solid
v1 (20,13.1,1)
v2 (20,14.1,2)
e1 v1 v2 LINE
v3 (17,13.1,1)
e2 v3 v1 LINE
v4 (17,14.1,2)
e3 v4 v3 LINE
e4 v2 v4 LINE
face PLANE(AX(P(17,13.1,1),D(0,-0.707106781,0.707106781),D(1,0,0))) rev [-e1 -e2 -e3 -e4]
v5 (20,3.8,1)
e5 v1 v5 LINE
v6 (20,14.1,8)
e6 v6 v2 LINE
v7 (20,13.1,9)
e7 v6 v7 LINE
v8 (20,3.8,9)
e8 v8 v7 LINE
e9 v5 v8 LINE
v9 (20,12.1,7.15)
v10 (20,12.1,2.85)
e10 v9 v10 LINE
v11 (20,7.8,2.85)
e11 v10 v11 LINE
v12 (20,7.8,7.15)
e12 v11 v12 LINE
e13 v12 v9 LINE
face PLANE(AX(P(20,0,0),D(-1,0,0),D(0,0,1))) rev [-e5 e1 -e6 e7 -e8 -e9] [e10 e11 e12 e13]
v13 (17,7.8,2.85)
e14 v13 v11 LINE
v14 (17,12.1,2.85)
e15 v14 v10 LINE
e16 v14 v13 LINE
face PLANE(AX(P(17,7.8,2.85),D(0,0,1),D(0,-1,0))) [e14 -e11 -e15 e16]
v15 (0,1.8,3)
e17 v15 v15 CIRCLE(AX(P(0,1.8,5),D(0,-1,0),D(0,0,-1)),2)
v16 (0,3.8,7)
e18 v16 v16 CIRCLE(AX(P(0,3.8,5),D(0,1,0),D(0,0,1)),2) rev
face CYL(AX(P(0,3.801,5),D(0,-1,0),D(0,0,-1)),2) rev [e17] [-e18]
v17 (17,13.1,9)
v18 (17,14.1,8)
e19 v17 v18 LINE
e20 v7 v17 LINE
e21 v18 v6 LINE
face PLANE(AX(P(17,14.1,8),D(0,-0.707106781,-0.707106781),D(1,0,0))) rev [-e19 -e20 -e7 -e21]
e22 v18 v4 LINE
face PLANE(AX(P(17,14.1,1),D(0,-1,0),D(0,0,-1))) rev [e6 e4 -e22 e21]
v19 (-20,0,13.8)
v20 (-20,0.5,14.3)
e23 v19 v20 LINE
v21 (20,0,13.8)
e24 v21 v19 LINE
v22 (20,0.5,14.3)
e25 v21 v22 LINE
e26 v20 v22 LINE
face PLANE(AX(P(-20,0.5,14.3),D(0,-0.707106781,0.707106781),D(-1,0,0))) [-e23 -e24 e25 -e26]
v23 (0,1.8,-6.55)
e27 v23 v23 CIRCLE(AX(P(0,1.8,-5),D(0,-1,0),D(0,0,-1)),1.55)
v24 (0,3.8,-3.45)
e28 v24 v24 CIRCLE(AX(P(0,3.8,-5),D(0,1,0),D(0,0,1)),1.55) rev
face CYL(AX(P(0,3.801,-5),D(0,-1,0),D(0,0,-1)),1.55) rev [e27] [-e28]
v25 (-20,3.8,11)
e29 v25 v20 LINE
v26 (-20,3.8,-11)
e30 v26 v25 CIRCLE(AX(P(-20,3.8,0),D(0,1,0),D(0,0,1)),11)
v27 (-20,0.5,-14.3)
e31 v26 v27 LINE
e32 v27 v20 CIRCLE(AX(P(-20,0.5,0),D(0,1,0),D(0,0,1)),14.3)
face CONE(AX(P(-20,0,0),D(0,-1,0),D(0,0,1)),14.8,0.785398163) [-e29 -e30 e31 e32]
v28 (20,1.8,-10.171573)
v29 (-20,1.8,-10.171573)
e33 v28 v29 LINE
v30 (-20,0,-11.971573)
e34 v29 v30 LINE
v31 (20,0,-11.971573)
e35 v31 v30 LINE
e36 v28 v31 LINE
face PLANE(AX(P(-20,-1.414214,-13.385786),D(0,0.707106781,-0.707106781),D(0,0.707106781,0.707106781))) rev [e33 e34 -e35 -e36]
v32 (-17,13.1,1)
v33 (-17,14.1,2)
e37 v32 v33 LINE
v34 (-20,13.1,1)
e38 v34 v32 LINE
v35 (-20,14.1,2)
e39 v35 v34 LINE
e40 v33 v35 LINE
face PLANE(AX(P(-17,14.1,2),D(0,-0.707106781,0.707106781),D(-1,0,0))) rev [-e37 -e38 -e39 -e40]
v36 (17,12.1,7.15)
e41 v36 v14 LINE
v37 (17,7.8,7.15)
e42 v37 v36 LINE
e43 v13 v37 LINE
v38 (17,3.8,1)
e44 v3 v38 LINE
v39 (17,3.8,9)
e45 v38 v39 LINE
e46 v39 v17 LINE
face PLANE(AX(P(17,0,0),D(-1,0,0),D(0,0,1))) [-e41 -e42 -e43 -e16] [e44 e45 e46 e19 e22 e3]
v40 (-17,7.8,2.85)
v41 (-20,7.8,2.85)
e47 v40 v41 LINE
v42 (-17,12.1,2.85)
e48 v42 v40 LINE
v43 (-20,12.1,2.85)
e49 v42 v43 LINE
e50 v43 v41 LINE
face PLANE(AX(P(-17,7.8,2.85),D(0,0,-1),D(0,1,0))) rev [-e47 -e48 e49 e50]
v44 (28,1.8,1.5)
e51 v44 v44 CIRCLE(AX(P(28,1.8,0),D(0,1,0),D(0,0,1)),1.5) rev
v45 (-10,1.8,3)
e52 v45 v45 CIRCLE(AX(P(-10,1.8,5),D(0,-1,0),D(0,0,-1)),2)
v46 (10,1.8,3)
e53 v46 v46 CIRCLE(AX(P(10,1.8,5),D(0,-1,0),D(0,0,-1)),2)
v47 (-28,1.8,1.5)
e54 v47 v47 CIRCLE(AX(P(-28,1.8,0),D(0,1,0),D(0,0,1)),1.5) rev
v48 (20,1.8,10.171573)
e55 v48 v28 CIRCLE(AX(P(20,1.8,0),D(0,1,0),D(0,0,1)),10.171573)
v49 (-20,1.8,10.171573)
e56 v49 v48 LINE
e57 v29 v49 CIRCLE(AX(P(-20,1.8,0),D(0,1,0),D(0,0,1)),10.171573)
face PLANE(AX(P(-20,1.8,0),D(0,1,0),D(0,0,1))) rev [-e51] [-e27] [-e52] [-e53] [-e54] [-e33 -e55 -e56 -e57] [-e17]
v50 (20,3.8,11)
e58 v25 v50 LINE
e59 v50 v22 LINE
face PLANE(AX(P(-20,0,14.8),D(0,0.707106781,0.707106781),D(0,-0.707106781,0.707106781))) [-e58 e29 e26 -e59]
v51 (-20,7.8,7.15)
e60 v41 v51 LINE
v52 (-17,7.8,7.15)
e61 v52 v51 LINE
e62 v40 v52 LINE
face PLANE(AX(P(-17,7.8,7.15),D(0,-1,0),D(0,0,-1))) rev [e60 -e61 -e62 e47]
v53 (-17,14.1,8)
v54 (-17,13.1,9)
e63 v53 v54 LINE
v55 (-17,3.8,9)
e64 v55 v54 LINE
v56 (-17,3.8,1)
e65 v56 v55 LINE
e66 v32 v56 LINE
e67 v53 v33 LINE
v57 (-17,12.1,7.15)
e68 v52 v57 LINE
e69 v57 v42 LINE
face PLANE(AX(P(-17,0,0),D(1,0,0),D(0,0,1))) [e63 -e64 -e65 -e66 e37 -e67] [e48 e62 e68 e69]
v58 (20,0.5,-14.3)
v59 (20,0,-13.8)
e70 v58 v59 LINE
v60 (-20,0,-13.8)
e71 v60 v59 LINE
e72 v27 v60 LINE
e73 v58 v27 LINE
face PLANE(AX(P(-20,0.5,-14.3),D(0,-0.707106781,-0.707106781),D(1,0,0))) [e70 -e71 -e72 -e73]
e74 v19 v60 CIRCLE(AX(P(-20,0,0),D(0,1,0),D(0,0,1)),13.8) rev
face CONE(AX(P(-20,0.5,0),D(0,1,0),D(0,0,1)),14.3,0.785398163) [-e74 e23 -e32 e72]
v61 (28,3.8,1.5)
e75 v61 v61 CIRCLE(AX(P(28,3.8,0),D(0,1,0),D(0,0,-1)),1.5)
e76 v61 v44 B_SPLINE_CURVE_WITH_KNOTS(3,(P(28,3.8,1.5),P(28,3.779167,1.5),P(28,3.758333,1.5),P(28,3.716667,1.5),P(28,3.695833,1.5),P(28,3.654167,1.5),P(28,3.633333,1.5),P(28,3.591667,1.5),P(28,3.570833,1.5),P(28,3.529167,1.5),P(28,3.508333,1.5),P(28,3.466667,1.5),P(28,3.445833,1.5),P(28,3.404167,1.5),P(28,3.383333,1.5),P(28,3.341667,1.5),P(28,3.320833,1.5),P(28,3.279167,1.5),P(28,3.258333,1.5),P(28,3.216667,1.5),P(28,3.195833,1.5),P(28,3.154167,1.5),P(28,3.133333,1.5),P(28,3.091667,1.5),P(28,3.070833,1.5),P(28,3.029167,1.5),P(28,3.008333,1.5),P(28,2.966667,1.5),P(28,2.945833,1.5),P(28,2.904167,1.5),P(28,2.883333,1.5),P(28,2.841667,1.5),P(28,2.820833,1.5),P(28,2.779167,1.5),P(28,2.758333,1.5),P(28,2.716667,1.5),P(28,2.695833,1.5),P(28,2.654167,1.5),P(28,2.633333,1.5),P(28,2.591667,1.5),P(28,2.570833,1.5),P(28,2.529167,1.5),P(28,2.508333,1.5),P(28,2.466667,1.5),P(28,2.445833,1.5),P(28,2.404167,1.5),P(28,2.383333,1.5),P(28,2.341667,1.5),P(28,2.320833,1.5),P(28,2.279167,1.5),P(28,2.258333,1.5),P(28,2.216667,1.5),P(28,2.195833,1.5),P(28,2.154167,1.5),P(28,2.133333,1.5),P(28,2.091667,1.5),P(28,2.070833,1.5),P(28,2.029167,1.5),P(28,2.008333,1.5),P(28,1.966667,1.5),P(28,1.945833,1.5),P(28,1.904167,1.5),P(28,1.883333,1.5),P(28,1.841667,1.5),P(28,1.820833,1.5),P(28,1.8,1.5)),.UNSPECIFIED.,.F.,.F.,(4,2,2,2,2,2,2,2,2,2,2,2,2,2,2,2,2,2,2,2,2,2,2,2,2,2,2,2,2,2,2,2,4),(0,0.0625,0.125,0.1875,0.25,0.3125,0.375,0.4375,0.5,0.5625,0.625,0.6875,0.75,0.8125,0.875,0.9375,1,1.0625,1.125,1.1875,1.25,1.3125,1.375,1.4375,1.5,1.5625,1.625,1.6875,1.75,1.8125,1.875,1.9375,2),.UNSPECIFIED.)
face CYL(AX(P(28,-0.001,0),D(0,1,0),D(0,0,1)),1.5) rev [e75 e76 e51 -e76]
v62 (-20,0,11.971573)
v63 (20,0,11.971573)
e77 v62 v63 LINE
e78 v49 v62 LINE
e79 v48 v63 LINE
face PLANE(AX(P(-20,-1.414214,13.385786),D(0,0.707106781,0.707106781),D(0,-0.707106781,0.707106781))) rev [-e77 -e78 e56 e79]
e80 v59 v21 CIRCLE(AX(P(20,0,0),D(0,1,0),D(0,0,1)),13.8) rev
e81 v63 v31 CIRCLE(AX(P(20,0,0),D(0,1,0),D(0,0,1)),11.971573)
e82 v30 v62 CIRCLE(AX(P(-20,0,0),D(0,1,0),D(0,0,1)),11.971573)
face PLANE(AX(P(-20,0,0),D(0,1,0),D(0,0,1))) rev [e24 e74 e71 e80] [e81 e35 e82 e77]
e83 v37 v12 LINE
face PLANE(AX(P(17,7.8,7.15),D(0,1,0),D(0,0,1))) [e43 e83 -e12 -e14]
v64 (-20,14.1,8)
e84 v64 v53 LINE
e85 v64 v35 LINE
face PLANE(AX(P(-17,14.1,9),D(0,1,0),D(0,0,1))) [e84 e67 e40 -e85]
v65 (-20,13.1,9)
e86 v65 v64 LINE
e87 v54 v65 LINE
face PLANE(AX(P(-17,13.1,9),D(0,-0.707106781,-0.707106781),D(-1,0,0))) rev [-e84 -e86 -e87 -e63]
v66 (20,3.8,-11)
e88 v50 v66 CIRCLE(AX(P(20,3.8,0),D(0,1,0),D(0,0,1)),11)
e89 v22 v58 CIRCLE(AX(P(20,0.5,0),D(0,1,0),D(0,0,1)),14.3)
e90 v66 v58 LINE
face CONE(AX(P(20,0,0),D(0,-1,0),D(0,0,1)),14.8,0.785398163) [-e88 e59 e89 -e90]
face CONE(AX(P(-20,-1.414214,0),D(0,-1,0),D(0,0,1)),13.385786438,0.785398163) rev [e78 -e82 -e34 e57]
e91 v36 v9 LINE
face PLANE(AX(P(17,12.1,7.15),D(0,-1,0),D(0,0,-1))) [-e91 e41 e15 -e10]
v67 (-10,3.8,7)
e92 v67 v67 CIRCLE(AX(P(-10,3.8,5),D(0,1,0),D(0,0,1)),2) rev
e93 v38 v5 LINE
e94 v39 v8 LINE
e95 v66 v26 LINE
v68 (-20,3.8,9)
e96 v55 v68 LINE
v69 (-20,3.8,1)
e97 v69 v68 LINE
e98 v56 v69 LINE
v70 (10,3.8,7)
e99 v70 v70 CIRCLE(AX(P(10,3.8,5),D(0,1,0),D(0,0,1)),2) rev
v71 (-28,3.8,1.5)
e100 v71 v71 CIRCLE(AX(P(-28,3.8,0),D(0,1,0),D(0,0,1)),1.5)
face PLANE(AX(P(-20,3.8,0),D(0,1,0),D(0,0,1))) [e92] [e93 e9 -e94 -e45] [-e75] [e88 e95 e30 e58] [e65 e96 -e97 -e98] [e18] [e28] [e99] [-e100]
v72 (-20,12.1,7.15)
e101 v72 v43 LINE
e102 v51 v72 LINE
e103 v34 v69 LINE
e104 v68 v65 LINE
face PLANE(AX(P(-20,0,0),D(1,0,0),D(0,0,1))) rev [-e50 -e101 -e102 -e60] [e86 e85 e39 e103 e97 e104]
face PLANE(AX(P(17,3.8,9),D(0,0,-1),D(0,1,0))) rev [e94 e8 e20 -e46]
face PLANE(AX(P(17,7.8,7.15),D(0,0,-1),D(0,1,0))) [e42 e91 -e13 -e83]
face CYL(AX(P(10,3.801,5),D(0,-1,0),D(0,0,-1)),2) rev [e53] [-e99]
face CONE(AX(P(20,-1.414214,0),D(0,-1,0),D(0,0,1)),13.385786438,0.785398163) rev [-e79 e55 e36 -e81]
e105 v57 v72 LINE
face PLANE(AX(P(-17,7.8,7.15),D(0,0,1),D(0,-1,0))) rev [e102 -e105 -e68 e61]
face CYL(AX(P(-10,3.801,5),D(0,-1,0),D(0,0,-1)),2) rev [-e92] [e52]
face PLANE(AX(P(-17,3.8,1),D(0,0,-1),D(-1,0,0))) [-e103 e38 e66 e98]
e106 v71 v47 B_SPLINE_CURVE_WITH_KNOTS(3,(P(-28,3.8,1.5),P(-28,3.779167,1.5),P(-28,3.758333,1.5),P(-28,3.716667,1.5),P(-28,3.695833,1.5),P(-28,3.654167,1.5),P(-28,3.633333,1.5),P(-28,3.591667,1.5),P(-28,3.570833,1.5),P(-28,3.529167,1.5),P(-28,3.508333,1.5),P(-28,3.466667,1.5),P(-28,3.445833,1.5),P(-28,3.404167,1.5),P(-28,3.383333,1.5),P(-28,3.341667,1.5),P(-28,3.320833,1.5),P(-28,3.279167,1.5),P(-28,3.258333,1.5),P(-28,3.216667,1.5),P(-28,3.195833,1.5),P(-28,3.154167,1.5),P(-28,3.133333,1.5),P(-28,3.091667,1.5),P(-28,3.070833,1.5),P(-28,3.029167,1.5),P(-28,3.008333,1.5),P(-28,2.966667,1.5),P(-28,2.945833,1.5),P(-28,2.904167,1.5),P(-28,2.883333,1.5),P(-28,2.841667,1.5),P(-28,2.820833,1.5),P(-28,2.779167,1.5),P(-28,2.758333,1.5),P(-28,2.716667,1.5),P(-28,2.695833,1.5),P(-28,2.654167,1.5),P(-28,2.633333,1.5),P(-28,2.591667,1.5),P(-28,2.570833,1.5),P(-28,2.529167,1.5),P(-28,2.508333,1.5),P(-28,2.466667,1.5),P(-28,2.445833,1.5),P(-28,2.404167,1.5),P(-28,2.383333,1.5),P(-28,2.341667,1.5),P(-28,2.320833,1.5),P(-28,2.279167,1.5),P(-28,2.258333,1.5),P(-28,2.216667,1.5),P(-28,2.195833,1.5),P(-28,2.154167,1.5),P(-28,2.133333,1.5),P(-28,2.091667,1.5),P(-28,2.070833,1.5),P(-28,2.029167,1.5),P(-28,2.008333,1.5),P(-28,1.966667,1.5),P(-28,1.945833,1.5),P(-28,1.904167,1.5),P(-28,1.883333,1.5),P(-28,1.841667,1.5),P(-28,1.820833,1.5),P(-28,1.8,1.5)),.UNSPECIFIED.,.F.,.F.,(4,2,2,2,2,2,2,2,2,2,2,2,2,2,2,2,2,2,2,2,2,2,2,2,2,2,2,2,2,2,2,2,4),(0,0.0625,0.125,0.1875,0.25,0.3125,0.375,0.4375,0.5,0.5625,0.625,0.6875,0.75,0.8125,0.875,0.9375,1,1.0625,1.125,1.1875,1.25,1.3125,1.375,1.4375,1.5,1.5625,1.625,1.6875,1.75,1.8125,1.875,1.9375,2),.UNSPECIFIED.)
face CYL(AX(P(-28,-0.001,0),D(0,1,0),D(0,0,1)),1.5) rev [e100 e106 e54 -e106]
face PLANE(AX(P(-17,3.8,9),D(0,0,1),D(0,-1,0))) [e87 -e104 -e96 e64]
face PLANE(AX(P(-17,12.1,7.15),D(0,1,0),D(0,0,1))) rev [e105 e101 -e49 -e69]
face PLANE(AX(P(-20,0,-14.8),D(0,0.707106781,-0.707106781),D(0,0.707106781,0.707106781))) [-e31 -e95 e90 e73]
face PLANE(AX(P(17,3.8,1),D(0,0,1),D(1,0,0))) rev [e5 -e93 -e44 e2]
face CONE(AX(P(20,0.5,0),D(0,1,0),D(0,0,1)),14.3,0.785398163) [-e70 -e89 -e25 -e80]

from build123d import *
from OCP.BRepFilletAPI import BRepFilletAPI_MakeChamfer

# Parameters (mm, degrees)
BOSS_EXTRU_1_DEPTH           = 3.8
BOSS_EXTRU_1_TAPER           = 45
COQUE2_DEPTH                 = 1.8
COQUE2_DRAFT                 = 45
CHANFREIN1_SIZE              = 1
CHANFREIN1_SIZE2             = 0.707106781
ENL_V_MAT_EXTRU_1_REACH      = 39.355
ESQUISSE2_R                  = 1.5
ENL_V_MAT_EXTRU_2_REACH      = 39.215
ESQUISSE3_R                  = 1.55
ESQUISSE3_R_2                = 2
ESQUISSE4_W                  = 4.3
ESQUISSE4_H                  = 4.3
BOSS_EXTRU_2_DEPTH           = 3
CHANFREIN2_SIZE              = 1
CHANFREIN2_OF_SYM_TRIE1_SIZE = 1


# Read off the part's stored shape, not the designer's step: Coque2
with BuildPart() as part:
    # Esquisse1 → Boss.-Extru.1 (new body)
    with BuildSketch(Plane(origin=(0, 0, 0), x_dir=(1, 0, 0), z_dir=(0, 1, 0))):
        with BuildLine():
            ThreePointArc((-20, 14.8), (-34.8, 0), (-20, -14.8))
            Line((-20, -14.8), (20, -14.8))
            ThreePointArc((20, -14.8), (34.8, 0), (20, 14.8))
            Line((20, 14.8), (-20, 14.8))
        make_face()
    extrude(amount=BOSS_EXTRU_1_DEPTH, taper=BOSS_EXTRU_1_TAPER)


with BuildPart() as coque2_tool:
    # Coque2 outline → Coque2 (with draft: the straight prism first)
    with BuildSketch(Plane(origin=(0, 1.8, 0), x_dir=(1, 0, 0), z_dir=(0, 1, 0))):
        with BuildLine():
            Line((-20, -10.171572875), (20, -10.171572875))
            ThreePointArc((20, -10.171572875), (30.171572875, 0), (20, 10.171572875))
            Line((20, 10.171572875), (-20, 10.171572875))
            ThreePointArc((-20, 10.171572875), (-30.171572875, 0), (-20, -10.171572875))
        make_face()
    extrude(amount=-COQUE2_DEPTH)
    # Coque2: the draft: its side faces are tilted about the plane it starts from
    coque2_sides = [coque2_tool.faces().sort_by_distance(p)[0] for p in [
        (0, 0.9, 10.171572875),
        (30.171572875, 0.9, 0),
        (0, 0.9, -10.171572875),
        (-30.171572875, 0.9, 0),
    ]]
    draft(coque2_sides, Plane(origin=(0, 1.8, 0), x_dir=(1, 0, 0), z_dir=(0, 1, 0)), COQUE2_DRAFT)


with BuildPart() as part_1:
    add(part.part)

    # Coque2: cut by coque2_tool
    add(coque2_tool.part, mode=Mode.SUBTRACT)

    # Chanfrein1: one chamfer whose edges measure the first distance from different faces: ONE call of the kernel's chamfer builder (chamfer() names one face for all edges)
    chanfrein1_edges_1 = [part_1.edges().sort_by_distance(p)[0] for p in [
        (0, 0, -14.8),
        (0, 0, 14.8),
        (-34.8, 0, 0),
    ]]
    chanfrein1_side_1 = [part_1.faces().sort_by_distance(p)[0] for p in [
        (0, 0, -14.043672029),
    ]]
    chanfrein1_edges_2 = [part_1.edges().sort_by_distance(p)[0] for p in [
        (34.8, 0, 0),
    ]]
    chanfrein1_side_2 = [part_1.faces().sort_by_distance(p)[0] for p in [
        (32.9, 1.9, 0),
    ]]
    chanfrein1 = BRepFilletAPI_MakeChamfer(part_1.part.solid().wrapped)
    for e in chanfrein1_edges_1:
        chanfrein1.Add(CHANFREIN1_SIZE, CHANFREIN1_SIZE2, e.wrapped, chanfrein1_side_1[0].wrapped)  # the first distance lies on this face
    for e in chanfrein1_edges_2:
        chanfrein1.Add(CHANFREIN1_SIZE, CHANFREIN1_SIZE2, e.wrapped, chanfrein1_side_2[0].wrapped)  # the first distance lies on this face
    add(Compound.cast(chanfrein1.Shape()), mode=Mode.REPLACE)

    # Esquisse2 → Enlèv. mat.-Extru.1 (cut, up to next)
    with BuildSketch(Plane(origin=(0, 3.8, 0), x_dir=(1, 0, 0), z_dir=(0, 1, 0)), mode=Mode.PRIVATE) as enl_v_mat_extru_1_sk1:
        with Locations(Location((-28, 0, 0), (0, 0, 270))):
            Circle(ESQUISSE2_R)
    enl_v_mat_extru_1_tool1 = extrude(enl_v_mat_extru_1_sk1.sketch, amount=-ENL_V_MAT_EXTRU_1_REACH, mode=Mode.PRIVATE) & part_1.part
    # Esquisse2 → Enlèv. mat.-Extru.1 (cut, up to next)
    with BuildSketch(Plane(origin=(0, 3.8, 0), x_dir=(1, 0, 0), z_dir=(0, 1, 0)), mode=Mode.PRIVATE) as enl_v_mat_extru_1_sk2:
        with Locations(Location((28, 0, 0), (0, 0, 270))):
            Circle(ESQUISSE2_R)
    enl_v_mat_extru_1_tool2 = extrude(enl_v_mat_extru_1_sk2.sketch, amount=-ENL_V_MAT_EXTRU_1_REACH, mode=Mode.PRIVATE) & part_1.part
    add(enl_v_mat_extru_1_tool1.solids().sort_by_distance((-28, 3.8, 0))[0], mode=Mode.SUBTRACT)
    add(enl_v_mat_extru_1_tool2.solids().sort_by_distance((28, 3.8, 0))[0], mode=Mode.SUBTRACT)

    # Esquisse3 → Enlèv. mat.-Extru.2 (cut, up to next)
    with BuildSketch(Plane.XZ.offset(-1.8), mode=Mode.PRIVATE) as enl_v_mat_extru_2_sk1:
        with Locations(Location((0, -5, 0), (0, 0, 270))):
            Circle(ESQUISSE3_R)
    enl_v_mat_extru_2_tool1 = extrude(enl_v_mat_extru_2_sk1.sketch, amount=-ENL_V_MAT_EXTRU_2_REACH, mode=Mode.PRIVATE) & part_1.part
    # Esquisse3 → Enlèv. mat.-Extru.2 (cut, up to next)
    with BuildSketch(Plane.XZ.offset(-1.8), mode=Mode.PRIVATE) as enl_v_mat_extru_2_sk2:
        with Locations(Location((10, 5, 0), (0, 0, 270))):
            Circle(ESQUISSE3_R_2)
    enl_v_mat_extru_2_tool2 = extrude(enl_v_mat_extru_2_sk2.sketch, amount=-ENL_V_MAT_EXTRU_2_REACH, mode=Mode.PRIVATE) & part_1.part
    # Esquisse3 → Enlèv. mat.-Extru.2 (cut, up to next)
    with BuildSketch(Plane.XZ.offset(-1.8), mode=Mode.PRIVATE) as enl_v_mat_extru_2_sk3:
        with Locations(Location((0, 5, 0), (0, 0, 270))):
            Circle(ESQUISSE3_R_2)
    enl_v_mat_extru_2_tool3 = extrude(enl_v_mat_extru_2_sk3.sketch, amount=-ENL_V_MAT_EXTRU_2_REACH, mode=Mode.PRIVATE) & part_1.part
    # Esquisse3 → Enlèv. mat.-Extru.2 (cut, up to next)
    with BuildSketch(Plane.XZ.offset(-1.8), mode=Mode.PRIVATE) as enl_v_mat_extru_2_sk4:
        with Locations(Location((-10, 5, 0), (0, 0, 270))):
            Circle(ESQUISSE3_R_2)
    enl_v_mat_extru_2_tool4 = extrude(enl_v_mat_extru_2_sk4.sketch, amount=-ENL_V_MAT_EXTRU_2_REACH, mode=Mode.PRIVATE) & part_1.part
    add(enl_v_mat_extru_2_tool1.solids().sort_by_distance((0, 1.8, -5))[0], mode=Mode.SUBTRACT)
    add(enl_v_mat_extru_2_tool2.solids().sort_by_distance((10, 1.8, 5))[0], mode=Mode.SUBTRACT)
    add(enl_v_mat_extru_2_tool3.solids().sort_by_distance((0, 1.8, 5))[0], mode=Mode.SUBTRACT)
    add(enl_v_mat_extru_2_tool4.solids().sort_by_distance((-10, 1.8, 5))[0], mode=Mode.SUBTRACT)

    # Esquisse4 → Boss.-Extru.2 (add)
    with BuildSketch(Plane.ZY.offset(-20)):
        Polygon((9, 3.8), (1, 3.8), (1, 14.1), (5, 14.1), (9, 14.1), align=None)
        with Locations((5, 9.95)):
            Rectangle(ESQUISSE4_W, ESQUISSE4_H, mode=Mode.SUBTRACT)
    boss_extru_2 = extrude(amount=BOSS_EXTRU_2_DEPTH)

    # Chanfrein2
    chanfrein2_edges = [part_1.edges().sort_by_distance(p)[0] for p in [
        (18.5, 14.1, 9),
        (18.5, 14.1, 1),
    ]]
    chamfer(chanfrein2_edges, length=CHANFREIN2_SIZE)

    # Symétrie1: Boss.-Extru.2 across plane
    add(boss_extru_2.mirror(Plane(origin=(0, 0, 0), x_dir=(0, 0, 1), z_dir=(1, 0, 0))))

    # Chanfrein2 of Symétrie1
    chanfrein2_of_sym_trie1_edges = [part_1.edges().sort_by_distance(p)[0] for p in [
        (-18.5, 14.1, 9),
        (-18.5, 14.1, 1),
    ]]
    chamfer(chanfrein2_of_sym_trie1_edges, length=CHANFREIN2_OF_SYM_TRIE1_SIZE)


solid = part_1.part
